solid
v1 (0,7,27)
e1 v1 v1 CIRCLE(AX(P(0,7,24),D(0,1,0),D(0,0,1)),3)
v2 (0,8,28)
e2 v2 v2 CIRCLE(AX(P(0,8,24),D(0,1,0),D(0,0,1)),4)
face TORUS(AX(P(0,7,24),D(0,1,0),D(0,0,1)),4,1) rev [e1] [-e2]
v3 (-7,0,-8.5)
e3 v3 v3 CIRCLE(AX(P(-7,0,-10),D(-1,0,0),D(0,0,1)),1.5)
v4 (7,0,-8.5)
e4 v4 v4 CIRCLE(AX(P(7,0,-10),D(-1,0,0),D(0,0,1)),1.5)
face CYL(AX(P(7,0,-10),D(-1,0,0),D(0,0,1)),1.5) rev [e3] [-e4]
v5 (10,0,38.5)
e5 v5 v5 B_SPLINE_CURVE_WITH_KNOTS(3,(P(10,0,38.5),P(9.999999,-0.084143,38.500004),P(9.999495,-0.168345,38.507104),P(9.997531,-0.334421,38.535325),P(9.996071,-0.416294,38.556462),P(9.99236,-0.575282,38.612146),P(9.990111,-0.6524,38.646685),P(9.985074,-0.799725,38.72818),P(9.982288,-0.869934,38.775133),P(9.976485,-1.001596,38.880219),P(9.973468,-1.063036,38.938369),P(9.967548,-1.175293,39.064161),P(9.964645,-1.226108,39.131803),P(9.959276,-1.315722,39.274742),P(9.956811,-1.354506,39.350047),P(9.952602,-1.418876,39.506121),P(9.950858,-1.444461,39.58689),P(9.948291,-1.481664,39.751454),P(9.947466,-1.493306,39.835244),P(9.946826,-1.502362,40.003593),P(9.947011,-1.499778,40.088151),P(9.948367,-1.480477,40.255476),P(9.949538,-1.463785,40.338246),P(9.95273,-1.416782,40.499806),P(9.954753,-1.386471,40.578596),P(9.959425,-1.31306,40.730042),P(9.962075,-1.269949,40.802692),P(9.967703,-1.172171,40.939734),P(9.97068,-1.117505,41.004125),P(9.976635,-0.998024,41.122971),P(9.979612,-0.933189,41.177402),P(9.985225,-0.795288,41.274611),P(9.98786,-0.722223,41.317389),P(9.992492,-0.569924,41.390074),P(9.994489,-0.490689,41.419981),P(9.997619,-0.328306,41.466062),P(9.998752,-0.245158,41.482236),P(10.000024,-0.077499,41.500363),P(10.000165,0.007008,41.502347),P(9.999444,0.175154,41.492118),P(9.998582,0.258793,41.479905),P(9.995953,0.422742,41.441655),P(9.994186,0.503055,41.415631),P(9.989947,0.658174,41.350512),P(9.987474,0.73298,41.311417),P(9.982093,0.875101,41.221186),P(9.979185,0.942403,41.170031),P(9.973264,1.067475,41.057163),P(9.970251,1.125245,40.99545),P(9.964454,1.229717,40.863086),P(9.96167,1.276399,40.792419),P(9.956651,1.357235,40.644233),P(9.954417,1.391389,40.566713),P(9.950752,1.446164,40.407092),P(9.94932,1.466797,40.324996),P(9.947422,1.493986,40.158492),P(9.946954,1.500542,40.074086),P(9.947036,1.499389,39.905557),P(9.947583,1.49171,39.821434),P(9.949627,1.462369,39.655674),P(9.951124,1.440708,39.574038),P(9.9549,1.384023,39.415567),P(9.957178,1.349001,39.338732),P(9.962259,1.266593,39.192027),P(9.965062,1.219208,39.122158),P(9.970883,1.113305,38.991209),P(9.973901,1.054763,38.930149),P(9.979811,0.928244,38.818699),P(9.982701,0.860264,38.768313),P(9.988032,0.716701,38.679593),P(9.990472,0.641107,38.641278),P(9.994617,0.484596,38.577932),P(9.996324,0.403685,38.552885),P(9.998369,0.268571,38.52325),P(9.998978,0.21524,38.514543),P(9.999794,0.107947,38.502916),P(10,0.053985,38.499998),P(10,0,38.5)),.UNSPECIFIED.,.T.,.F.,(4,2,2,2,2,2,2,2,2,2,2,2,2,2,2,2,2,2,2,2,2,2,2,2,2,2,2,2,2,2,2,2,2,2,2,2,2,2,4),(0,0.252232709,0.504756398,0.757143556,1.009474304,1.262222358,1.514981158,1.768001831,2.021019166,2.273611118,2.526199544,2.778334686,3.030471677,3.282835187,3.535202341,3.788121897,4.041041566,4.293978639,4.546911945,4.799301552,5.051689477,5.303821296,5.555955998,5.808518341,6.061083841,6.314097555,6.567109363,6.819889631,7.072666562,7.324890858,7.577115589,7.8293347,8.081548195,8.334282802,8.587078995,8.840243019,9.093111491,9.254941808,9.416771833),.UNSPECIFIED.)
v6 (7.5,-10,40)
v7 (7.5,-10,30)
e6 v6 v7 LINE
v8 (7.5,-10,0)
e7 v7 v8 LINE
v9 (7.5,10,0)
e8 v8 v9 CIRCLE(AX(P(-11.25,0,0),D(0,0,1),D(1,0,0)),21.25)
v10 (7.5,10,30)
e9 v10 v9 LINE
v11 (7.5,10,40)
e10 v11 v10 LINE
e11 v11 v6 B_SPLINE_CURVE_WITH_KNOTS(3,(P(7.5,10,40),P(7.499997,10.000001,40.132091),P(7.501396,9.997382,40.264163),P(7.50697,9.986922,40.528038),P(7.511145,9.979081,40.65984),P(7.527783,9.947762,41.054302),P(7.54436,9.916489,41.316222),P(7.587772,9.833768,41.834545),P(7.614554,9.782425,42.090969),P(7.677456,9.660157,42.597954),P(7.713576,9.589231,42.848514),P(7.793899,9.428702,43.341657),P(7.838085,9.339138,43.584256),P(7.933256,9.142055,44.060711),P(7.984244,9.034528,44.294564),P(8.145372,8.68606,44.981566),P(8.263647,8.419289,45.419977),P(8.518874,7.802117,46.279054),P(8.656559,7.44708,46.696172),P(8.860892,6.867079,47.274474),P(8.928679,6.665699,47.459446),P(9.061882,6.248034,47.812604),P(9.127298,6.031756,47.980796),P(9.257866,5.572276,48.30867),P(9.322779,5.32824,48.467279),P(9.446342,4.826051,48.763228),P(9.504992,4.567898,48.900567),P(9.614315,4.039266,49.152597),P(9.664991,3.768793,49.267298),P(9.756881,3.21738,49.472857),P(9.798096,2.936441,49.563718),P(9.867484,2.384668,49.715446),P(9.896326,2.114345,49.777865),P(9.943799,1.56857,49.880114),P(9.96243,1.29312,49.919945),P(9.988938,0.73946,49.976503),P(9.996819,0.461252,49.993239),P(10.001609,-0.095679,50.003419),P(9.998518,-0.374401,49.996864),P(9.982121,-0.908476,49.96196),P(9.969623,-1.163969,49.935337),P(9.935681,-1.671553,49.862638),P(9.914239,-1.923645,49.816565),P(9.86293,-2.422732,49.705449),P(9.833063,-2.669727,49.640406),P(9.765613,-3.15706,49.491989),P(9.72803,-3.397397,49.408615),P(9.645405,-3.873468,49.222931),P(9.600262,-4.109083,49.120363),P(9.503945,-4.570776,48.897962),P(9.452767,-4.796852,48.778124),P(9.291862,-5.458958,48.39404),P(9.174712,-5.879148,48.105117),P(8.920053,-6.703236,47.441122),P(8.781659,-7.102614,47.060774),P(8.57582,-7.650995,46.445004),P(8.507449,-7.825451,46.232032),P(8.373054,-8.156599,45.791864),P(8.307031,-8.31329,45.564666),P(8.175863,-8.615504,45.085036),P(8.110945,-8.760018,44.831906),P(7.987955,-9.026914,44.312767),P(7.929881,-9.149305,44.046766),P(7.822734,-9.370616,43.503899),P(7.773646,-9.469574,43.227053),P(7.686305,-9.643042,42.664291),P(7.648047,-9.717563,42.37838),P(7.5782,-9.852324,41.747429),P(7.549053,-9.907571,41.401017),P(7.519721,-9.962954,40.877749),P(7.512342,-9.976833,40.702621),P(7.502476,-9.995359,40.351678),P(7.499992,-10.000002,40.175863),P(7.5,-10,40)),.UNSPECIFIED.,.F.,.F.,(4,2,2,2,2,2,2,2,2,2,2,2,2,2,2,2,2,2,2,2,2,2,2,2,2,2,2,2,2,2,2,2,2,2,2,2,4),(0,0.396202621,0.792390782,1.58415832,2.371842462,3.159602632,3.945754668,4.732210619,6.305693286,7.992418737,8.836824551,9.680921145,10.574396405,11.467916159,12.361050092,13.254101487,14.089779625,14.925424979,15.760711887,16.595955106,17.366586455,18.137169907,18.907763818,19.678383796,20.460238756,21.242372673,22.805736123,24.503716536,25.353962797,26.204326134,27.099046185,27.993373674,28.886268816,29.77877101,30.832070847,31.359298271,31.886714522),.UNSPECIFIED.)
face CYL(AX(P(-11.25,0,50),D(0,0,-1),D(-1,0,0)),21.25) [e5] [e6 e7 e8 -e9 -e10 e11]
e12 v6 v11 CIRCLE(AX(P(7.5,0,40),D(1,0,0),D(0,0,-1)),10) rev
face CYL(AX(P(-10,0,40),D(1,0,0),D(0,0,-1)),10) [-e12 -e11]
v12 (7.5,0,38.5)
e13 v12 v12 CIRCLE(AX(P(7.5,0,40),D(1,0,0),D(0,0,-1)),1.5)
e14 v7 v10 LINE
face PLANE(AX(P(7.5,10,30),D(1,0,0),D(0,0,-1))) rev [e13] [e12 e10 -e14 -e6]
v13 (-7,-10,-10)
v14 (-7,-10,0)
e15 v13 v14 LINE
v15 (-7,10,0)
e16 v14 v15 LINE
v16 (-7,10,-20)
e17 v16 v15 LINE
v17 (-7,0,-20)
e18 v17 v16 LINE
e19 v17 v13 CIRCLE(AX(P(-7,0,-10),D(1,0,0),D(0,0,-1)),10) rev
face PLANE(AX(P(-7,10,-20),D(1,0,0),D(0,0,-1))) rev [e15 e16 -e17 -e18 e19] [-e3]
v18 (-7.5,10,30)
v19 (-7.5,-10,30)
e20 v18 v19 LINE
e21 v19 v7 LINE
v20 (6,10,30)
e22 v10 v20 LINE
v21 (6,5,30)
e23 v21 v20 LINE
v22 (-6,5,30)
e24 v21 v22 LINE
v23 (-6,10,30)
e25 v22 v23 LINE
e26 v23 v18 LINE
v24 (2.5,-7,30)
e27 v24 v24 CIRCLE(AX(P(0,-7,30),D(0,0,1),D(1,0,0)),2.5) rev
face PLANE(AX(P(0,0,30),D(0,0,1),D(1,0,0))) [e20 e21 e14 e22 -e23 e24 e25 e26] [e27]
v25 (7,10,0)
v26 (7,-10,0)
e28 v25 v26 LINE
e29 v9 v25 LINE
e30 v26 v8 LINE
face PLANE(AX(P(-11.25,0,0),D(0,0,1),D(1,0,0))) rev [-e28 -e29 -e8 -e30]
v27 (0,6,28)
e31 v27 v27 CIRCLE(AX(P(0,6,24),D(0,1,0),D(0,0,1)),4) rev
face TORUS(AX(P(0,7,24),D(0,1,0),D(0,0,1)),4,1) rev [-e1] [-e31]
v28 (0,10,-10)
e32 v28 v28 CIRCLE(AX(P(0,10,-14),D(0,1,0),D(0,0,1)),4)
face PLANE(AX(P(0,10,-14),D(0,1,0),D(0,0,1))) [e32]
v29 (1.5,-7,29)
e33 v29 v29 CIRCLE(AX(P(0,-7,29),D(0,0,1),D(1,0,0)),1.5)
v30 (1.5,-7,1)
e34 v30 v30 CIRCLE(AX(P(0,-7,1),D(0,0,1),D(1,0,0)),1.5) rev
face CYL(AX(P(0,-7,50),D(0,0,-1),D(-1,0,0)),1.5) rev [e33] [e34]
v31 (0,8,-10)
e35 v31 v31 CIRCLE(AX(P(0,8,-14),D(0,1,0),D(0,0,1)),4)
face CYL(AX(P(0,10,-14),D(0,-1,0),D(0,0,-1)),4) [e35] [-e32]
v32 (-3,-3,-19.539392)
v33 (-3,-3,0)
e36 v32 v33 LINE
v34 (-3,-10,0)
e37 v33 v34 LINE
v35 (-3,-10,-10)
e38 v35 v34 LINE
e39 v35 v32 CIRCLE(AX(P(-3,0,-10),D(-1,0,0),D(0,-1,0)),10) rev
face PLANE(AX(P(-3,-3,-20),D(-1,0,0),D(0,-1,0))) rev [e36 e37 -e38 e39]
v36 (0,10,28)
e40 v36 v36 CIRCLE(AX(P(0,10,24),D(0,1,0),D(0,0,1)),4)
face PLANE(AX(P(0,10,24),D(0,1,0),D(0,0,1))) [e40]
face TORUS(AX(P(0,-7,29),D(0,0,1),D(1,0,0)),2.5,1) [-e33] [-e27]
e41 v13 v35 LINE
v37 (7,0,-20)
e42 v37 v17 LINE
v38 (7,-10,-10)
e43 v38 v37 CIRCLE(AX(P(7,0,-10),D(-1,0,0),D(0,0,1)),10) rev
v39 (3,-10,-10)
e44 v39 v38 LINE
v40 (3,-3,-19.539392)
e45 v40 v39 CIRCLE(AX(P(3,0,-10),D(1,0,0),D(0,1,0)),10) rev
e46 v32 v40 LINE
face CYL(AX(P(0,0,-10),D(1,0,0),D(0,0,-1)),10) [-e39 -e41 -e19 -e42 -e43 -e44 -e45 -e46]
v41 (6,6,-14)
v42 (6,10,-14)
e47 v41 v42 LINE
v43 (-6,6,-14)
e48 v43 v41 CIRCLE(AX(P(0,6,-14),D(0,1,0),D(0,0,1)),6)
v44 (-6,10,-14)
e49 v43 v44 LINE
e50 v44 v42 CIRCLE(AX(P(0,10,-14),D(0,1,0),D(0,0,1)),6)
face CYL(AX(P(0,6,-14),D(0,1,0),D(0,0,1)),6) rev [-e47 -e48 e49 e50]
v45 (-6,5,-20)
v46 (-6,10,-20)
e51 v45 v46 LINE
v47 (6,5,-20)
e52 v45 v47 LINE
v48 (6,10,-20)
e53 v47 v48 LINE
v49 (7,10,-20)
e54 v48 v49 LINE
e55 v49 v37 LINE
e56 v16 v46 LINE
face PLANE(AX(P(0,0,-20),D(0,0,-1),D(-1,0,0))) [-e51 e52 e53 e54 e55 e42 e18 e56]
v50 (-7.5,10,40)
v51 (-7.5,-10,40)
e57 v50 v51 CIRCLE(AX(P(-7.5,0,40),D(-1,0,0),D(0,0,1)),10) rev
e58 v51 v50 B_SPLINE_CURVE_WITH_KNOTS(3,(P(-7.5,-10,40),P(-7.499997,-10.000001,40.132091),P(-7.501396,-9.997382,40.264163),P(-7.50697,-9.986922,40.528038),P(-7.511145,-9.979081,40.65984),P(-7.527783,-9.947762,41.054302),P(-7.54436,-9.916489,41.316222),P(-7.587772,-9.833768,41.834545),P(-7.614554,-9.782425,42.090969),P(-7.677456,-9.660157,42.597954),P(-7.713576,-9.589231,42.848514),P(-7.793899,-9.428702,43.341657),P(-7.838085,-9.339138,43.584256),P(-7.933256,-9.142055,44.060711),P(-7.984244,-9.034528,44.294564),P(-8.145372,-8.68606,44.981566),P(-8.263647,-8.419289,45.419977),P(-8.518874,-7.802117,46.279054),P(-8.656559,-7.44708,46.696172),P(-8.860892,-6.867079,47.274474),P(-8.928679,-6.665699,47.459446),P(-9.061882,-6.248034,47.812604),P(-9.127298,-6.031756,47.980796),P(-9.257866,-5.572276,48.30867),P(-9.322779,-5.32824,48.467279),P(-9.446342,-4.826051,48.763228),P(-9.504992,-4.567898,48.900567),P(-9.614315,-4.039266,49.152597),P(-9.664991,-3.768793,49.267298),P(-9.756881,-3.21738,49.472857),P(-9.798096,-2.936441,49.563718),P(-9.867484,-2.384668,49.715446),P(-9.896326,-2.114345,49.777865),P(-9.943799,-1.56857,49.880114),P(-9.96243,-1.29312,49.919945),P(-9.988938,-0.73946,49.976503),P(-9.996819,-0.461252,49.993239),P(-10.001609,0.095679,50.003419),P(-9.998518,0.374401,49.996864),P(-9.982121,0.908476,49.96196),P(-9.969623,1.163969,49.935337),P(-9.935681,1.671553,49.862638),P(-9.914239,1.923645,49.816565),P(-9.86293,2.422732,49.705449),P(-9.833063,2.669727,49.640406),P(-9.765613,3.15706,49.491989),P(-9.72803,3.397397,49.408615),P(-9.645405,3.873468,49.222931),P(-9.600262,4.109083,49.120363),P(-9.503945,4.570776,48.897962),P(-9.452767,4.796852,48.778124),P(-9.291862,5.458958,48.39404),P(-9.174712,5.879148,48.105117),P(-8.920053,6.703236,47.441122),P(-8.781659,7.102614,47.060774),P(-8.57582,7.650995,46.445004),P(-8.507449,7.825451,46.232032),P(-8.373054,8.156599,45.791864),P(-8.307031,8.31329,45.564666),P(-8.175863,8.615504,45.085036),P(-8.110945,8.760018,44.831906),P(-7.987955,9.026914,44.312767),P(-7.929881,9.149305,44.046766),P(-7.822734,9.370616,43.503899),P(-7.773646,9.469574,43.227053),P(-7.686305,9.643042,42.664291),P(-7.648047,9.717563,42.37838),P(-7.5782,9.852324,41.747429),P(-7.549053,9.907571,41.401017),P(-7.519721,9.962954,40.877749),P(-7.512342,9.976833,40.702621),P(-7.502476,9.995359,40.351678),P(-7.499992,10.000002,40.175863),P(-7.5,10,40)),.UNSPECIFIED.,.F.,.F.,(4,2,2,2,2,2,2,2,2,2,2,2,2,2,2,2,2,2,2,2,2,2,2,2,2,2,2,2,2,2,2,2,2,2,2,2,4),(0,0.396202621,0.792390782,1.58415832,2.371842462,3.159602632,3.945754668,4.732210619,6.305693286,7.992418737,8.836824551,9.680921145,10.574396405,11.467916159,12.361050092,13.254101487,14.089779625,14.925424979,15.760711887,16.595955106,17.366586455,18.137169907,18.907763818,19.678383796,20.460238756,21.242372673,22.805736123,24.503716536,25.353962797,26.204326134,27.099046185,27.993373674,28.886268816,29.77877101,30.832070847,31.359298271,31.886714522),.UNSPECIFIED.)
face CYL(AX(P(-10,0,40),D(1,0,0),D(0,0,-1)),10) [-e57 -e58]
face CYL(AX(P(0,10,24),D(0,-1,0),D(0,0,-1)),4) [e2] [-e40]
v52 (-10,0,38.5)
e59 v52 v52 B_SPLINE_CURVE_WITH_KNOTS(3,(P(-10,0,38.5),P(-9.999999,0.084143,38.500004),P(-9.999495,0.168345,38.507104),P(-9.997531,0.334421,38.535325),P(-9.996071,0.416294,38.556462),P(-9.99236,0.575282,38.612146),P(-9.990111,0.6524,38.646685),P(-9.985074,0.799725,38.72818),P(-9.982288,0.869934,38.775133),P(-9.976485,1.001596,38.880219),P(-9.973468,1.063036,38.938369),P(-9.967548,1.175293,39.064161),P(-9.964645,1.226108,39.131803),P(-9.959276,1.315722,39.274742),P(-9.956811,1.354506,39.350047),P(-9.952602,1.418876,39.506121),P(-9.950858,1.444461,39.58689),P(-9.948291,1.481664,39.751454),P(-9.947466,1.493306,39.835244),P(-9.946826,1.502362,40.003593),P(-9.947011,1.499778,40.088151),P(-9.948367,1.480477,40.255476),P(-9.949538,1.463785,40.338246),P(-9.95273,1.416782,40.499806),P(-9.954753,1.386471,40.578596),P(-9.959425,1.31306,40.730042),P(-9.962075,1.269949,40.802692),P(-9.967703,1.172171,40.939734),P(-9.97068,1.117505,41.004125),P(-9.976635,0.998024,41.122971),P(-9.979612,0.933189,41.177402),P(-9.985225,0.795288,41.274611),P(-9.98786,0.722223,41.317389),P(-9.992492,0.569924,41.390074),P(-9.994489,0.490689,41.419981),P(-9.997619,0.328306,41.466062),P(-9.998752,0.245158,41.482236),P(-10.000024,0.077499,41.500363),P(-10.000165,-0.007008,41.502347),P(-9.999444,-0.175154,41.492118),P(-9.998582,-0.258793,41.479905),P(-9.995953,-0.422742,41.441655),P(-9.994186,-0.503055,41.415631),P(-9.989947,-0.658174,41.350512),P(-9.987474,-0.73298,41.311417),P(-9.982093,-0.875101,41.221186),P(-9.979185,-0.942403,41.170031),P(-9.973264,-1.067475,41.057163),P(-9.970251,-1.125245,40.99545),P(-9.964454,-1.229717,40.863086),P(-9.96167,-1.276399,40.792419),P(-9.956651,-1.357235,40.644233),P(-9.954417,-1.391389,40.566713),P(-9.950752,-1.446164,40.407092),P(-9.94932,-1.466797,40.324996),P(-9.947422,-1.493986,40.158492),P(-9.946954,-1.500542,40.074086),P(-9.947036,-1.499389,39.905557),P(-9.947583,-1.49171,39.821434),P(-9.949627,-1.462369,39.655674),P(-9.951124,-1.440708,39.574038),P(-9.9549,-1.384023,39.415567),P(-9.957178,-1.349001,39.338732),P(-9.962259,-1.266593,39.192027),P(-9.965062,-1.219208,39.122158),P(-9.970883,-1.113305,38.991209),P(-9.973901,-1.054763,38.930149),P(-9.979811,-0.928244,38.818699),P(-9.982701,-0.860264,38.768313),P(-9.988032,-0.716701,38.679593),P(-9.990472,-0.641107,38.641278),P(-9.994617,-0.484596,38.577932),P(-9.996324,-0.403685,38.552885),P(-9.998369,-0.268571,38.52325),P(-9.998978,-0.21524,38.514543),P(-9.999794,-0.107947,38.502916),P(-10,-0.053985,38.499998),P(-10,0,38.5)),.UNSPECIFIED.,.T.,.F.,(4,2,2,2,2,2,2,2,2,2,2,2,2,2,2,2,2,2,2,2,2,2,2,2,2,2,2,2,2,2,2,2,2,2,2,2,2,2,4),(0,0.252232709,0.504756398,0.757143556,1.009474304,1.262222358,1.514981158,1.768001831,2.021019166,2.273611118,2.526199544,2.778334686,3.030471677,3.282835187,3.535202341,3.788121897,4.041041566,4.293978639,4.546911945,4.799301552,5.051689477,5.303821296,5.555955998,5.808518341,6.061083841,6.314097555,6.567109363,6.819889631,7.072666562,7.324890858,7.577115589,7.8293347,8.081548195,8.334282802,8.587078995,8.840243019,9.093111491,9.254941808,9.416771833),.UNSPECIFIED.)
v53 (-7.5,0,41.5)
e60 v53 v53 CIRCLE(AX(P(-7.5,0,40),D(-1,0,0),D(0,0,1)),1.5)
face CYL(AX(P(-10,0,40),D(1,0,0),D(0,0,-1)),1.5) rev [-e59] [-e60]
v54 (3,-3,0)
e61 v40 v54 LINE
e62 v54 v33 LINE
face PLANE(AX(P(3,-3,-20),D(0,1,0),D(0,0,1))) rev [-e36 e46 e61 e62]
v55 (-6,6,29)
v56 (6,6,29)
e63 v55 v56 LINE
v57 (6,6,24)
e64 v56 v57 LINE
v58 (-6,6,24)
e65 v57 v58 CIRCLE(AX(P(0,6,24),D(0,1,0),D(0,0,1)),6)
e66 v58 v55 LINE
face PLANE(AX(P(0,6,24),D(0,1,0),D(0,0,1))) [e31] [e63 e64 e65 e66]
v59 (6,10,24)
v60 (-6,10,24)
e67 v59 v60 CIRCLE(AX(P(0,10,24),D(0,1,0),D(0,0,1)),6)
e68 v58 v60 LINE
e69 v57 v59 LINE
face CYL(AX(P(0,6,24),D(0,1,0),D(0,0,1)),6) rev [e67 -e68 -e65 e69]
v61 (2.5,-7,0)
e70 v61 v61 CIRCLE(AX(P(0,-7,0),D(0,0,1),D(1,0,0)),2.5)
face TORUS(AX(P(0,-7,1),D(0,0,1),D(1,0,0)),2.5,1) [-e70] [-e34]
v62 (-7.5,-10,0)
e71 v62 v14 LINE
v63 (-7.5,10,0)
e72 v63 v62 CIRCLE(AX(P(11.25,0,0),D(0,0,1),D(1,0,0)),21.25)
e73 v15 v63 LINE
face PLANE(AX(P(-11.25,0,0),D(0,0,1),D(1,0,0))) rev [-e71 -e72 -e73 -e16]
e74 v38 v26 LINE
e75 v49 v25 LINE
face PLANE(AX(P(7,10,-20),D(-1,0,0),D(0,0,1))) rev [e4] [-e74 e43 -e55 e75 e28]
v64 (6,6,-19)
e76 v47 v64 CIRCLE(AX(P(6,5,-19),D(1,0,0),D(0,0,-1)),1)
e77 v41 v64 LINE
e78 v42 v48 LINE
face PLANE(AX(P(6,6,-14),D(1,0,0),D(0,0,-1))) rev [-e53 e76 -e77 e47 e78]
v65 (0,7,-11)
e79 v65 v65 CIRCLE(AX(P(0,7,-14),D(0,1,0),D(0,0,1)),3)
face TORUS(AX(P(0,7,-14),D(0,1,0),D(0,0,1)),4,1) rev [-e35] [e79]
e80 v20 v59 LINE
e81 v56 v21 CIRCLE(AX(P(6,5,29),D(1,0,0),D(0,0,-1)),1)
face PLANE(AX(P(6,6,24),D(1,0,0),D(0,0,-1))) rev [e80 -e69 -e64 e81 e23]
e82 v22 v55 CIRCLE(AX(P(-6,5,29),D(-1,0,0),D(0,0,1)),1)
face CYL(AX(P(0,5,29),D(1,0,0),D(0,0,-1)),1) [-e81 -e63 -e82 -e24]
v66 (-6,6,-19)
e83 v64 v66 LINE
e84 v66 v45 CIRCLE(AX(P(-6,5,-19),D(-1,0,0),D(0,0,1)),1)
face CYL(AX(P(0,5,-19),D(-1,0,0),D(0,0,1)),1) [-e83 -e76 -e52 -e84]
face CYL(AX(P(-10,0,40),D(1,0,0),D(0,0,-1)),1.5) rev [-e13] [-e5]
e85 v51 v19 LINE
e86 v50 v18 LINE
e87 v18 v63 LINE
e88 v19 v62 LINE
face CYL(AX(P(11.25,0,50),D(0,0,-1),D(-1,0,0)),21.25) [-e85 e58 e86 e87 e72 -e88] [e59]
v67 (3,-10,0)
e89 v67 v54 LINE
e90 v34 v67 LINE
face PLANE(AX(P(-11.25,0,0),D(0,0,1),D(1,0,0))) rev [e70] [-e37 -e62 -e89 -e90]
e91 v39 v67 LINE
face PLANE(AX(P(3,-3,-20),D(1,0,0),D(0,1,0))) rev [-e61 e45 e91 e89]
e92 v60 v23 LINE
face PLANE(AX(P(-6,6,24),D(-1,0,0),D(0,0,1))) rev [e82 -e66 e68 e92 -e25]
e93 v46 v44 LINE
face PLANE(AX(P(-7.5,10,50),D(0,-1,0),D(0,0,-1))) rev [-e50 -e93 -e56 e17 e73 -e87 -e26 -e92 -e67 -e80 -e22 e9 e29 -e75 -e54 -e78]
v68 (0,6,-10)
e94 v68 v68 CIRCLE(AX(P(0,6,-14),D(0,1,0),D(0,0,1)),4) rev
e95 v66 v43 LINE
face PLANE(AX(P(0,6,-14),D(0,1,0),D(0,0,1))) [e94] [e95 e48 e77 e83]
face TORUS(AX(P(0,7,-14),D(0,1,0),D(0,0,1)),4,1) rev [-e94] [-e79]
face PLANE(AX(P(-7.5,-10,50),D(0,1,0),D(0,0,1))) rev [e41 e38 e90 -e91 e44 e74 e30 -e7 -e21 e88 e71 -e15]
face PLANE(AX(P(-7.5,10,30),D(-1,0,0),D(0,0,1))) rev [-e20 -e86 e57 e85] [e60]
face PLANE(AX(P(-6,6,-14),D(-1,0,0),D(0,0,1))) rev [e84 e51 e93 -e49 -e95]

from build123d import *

# Parameters (mm, degrees)
SALIENTE_EXTRUIR2_DEPTH    = 50
CROQUIS4_R                 = 1.5
CORTAR_EXTRUIR1_DEPTH      = 50
SALIENTE_EXTRUIR3_DEPTH    = 20
CROQUIS8_R                 = 1.5
CORTAR_EXTRUIR4_DEPTH      = 14
REDONDEO1_R                = 10
CROQUIS6_W                 = 15
CROQUIS6_H                 = 20
CORTAR_EXTRUIR2_DEPTH      = 20
CORTAR_EXTRUIR3_DEPTH      = 52.961524227
CORTAR_EXTRUIR3_DEPTH_BACK = 52.961524227
CROQUIS7_R                 = 1.5
CUT_EXTRUDE1_DEPTH         = 4
SKETCH2_R                  = 3
BOSS_EXTRUDE1_DEPTH        = 2
SKETCH3_R                  = 4
BOSS_EXTRUDE2_DEPTH        = 2
FILLET1_R                  = 1
FILLET2_R                  = 1
FILLET3_R                  = 1


with BuildPart() as part:
    # Croquis2 → Saliente-Extruir2 (new body)
    with BuildSketch(Plane.XY):
        with BuildLine():
            Line((-7.5, -10), (7.5, -10))
            ThreePointArc((7.5, -10), (10, 0), (7.5, 10))
            Line((7.5, 10), (-7.5, 10))
            ThreePointArc((-7.5, 10), (-10, 0), (-7.5, -10))
        make_face()
    extrude(amount=SALIENTE_EXTRUIR2_DEPTH)

    # Croquis4 → Cortar-Extruir1 (cut)
    with BuildSketch(Plane(origin=(0, 0, 0), x_dir=(-1, 0, 0), z_dir=(0, 0, -1))):
        with Locations((0, -7)):
            Circle(CROQUIS4_R)
    extrude(amount=-CORTAR_EXTRUIR1_DEPTH, mode=Mode.SUBTRACT)

    # Croquis3 → Saliente-Extruir3 (add)
    with BuildSketch(Plane(origin=(0, 0, 0), x_dir=(-1, 0, 0), z_dir=(0, 0, -1))):
        Polygon((7, 10), (7, -10), (3, -10), (3, -3), (-3, -3), (-3, -10), (-7, -10), (-7, 10), align=None)
    extrude(amount=SALIENTE_EXTRUIR3_DEPTH)

    # Croquis8 → Cortar-Extruir4 (cut)
    with BuildSketch(Plane.ZY.offset(7)):
        with Locations((-10, 0)):
            Circle(CROQUIS8_R)
    extrude(amount=-CORTAR_EXTRUIR4_DEPTH, mode=Mode.SUBTRACT)

    # Redondeo1
    redondeo1_edges = [part.edges().sort_by_distance(p)[0] for p in [
        (5, -10, -20),
    ]]
    fillet(redondeo1_edges, radius=REDONDEO1_R)

    # Croquis6 → Cortar-Extruir2 (cut)
    with BuildSketch(Plane.XY.offset(50)):
        Rectangle(CROQUIS6_W, CROQUIS6_H)
    extrude(amount=-CORTAR_EXTRUIR2_DEPTH, mode=Mode.SUBTRACT)

    # Croquis7 → Cortar-Extruir3 (cut, two sides: drawn at the far end of the back side and taken through both)
    with BuildSketch(Plane(origin=(0, 0, 0), x_dir=(0, 0, -1), z_dir=(1, 0, 0)).offset(-CORTAR_EXTRUIR3_DEPTH_BACK)):
        with Locations((-40, 0)):
            Circle(CROQUIS7_R)
        with BuildLine():
            Line((-40, -10), (-55, -10))
            Line((-55, -10), (-55, 10))
            Line((-55, 10), (-40, 10))
            ThreePointArc((-40, 10), (-50, 0), (-40, -10))
        make_face()
    extrude(amount=CORTAR_EXTRUIR3_DEPTH + CORTAR_EXTRUIR3_DEPTH_BACK, mode=Mode.SUBTRACT)

    # Sketch1 → Cut-Extrude1 (cut)
    with BuildSketch(Plane(origin=(0, 10, 0), x_dir=(1, 0, 0), z_dir=(0, 1, 0))):
        with BuildLine():
            Line((-6, 14), (-6, 20))
            Line((-6, 20), (6, 20))
            Line((6, 20), (6, 14))
            ThreePointArc((6, 14), (0, 8), (-6, 14))
        make_face()
        with BuildLine():
            Line((-6, -24), (-6, -30))
            Line((-6, -30), (6, -30))
            Line((6, -30), (6, -24))
            ThreePointArc((6, -24), (0, -18), (-6, -24))
        make_face()
    extrude(amount=-CUT_EXTRUDE1_DEPTH, mode=Mode.SUBTRACT)

    # Sketch2 → Boss-Extrude1 (add)
    with BuildSketch(Plane(origin=(0, 6, 0), x_dir=(1, 0, 0), z_dir=(0, 1, 0))):
        with Locations(Location((0, 14, 0), (0, 0, 270))):
            Circle(SKETCH2_R)
        with Locations(Location((0, -24, 0), (0, 0, 270))):
            Circle(SKETCH2_R)
    extrude(amount=BOSS_EXTRUDE1_DEPTH)

    # Sketch3 → Boss-Extrude2 (add)
    with BuildSketch(Plane(origin=(0, 8, 0), x_dir=(1, 0, 0), z_dir=(0, 1, 0))):
        with Locations(Location((0, -24, 0), (0, 0, 270))):
            Circle(SKETCH3_R)
        with Locations(Location((0, 14, 0), (0, 0, 270))):
            Circle(SKETCH3_R)
    extrude(amount=BOSS_EXTRUDE2_DEPTH)

    # Fillet1
    fillet1_edges = [part.edges().sort_by_distance(p)[0] for p in [
        (0, 6, 21),
        (0, 8, 21),
        (0, 6, -17),
        (0, 8, -17),
    ]]
    fillet(fillet1_edges, radius=FILLET1_R - 0.0001)  # a hair under: the kernel refuses the full size

    # Fillet2
    fillet2_edges = [part.edges().sort_by_distance(p)[0] for p in [
        (0, 6, -20),
        (0, 6, 30),
    ]]
    fillet(fillet2_edges, radius=FILLET2_R)

    # Fillet3
    fillet3_edges = [part.edges().sort_by_distance(p)[0] for p in [
        (1.5, -7, 0),
        (1.5, -7, 30),
    ]]
    fillet(fillet3_edges, radius=FILLET3_R)


solid = part.part
